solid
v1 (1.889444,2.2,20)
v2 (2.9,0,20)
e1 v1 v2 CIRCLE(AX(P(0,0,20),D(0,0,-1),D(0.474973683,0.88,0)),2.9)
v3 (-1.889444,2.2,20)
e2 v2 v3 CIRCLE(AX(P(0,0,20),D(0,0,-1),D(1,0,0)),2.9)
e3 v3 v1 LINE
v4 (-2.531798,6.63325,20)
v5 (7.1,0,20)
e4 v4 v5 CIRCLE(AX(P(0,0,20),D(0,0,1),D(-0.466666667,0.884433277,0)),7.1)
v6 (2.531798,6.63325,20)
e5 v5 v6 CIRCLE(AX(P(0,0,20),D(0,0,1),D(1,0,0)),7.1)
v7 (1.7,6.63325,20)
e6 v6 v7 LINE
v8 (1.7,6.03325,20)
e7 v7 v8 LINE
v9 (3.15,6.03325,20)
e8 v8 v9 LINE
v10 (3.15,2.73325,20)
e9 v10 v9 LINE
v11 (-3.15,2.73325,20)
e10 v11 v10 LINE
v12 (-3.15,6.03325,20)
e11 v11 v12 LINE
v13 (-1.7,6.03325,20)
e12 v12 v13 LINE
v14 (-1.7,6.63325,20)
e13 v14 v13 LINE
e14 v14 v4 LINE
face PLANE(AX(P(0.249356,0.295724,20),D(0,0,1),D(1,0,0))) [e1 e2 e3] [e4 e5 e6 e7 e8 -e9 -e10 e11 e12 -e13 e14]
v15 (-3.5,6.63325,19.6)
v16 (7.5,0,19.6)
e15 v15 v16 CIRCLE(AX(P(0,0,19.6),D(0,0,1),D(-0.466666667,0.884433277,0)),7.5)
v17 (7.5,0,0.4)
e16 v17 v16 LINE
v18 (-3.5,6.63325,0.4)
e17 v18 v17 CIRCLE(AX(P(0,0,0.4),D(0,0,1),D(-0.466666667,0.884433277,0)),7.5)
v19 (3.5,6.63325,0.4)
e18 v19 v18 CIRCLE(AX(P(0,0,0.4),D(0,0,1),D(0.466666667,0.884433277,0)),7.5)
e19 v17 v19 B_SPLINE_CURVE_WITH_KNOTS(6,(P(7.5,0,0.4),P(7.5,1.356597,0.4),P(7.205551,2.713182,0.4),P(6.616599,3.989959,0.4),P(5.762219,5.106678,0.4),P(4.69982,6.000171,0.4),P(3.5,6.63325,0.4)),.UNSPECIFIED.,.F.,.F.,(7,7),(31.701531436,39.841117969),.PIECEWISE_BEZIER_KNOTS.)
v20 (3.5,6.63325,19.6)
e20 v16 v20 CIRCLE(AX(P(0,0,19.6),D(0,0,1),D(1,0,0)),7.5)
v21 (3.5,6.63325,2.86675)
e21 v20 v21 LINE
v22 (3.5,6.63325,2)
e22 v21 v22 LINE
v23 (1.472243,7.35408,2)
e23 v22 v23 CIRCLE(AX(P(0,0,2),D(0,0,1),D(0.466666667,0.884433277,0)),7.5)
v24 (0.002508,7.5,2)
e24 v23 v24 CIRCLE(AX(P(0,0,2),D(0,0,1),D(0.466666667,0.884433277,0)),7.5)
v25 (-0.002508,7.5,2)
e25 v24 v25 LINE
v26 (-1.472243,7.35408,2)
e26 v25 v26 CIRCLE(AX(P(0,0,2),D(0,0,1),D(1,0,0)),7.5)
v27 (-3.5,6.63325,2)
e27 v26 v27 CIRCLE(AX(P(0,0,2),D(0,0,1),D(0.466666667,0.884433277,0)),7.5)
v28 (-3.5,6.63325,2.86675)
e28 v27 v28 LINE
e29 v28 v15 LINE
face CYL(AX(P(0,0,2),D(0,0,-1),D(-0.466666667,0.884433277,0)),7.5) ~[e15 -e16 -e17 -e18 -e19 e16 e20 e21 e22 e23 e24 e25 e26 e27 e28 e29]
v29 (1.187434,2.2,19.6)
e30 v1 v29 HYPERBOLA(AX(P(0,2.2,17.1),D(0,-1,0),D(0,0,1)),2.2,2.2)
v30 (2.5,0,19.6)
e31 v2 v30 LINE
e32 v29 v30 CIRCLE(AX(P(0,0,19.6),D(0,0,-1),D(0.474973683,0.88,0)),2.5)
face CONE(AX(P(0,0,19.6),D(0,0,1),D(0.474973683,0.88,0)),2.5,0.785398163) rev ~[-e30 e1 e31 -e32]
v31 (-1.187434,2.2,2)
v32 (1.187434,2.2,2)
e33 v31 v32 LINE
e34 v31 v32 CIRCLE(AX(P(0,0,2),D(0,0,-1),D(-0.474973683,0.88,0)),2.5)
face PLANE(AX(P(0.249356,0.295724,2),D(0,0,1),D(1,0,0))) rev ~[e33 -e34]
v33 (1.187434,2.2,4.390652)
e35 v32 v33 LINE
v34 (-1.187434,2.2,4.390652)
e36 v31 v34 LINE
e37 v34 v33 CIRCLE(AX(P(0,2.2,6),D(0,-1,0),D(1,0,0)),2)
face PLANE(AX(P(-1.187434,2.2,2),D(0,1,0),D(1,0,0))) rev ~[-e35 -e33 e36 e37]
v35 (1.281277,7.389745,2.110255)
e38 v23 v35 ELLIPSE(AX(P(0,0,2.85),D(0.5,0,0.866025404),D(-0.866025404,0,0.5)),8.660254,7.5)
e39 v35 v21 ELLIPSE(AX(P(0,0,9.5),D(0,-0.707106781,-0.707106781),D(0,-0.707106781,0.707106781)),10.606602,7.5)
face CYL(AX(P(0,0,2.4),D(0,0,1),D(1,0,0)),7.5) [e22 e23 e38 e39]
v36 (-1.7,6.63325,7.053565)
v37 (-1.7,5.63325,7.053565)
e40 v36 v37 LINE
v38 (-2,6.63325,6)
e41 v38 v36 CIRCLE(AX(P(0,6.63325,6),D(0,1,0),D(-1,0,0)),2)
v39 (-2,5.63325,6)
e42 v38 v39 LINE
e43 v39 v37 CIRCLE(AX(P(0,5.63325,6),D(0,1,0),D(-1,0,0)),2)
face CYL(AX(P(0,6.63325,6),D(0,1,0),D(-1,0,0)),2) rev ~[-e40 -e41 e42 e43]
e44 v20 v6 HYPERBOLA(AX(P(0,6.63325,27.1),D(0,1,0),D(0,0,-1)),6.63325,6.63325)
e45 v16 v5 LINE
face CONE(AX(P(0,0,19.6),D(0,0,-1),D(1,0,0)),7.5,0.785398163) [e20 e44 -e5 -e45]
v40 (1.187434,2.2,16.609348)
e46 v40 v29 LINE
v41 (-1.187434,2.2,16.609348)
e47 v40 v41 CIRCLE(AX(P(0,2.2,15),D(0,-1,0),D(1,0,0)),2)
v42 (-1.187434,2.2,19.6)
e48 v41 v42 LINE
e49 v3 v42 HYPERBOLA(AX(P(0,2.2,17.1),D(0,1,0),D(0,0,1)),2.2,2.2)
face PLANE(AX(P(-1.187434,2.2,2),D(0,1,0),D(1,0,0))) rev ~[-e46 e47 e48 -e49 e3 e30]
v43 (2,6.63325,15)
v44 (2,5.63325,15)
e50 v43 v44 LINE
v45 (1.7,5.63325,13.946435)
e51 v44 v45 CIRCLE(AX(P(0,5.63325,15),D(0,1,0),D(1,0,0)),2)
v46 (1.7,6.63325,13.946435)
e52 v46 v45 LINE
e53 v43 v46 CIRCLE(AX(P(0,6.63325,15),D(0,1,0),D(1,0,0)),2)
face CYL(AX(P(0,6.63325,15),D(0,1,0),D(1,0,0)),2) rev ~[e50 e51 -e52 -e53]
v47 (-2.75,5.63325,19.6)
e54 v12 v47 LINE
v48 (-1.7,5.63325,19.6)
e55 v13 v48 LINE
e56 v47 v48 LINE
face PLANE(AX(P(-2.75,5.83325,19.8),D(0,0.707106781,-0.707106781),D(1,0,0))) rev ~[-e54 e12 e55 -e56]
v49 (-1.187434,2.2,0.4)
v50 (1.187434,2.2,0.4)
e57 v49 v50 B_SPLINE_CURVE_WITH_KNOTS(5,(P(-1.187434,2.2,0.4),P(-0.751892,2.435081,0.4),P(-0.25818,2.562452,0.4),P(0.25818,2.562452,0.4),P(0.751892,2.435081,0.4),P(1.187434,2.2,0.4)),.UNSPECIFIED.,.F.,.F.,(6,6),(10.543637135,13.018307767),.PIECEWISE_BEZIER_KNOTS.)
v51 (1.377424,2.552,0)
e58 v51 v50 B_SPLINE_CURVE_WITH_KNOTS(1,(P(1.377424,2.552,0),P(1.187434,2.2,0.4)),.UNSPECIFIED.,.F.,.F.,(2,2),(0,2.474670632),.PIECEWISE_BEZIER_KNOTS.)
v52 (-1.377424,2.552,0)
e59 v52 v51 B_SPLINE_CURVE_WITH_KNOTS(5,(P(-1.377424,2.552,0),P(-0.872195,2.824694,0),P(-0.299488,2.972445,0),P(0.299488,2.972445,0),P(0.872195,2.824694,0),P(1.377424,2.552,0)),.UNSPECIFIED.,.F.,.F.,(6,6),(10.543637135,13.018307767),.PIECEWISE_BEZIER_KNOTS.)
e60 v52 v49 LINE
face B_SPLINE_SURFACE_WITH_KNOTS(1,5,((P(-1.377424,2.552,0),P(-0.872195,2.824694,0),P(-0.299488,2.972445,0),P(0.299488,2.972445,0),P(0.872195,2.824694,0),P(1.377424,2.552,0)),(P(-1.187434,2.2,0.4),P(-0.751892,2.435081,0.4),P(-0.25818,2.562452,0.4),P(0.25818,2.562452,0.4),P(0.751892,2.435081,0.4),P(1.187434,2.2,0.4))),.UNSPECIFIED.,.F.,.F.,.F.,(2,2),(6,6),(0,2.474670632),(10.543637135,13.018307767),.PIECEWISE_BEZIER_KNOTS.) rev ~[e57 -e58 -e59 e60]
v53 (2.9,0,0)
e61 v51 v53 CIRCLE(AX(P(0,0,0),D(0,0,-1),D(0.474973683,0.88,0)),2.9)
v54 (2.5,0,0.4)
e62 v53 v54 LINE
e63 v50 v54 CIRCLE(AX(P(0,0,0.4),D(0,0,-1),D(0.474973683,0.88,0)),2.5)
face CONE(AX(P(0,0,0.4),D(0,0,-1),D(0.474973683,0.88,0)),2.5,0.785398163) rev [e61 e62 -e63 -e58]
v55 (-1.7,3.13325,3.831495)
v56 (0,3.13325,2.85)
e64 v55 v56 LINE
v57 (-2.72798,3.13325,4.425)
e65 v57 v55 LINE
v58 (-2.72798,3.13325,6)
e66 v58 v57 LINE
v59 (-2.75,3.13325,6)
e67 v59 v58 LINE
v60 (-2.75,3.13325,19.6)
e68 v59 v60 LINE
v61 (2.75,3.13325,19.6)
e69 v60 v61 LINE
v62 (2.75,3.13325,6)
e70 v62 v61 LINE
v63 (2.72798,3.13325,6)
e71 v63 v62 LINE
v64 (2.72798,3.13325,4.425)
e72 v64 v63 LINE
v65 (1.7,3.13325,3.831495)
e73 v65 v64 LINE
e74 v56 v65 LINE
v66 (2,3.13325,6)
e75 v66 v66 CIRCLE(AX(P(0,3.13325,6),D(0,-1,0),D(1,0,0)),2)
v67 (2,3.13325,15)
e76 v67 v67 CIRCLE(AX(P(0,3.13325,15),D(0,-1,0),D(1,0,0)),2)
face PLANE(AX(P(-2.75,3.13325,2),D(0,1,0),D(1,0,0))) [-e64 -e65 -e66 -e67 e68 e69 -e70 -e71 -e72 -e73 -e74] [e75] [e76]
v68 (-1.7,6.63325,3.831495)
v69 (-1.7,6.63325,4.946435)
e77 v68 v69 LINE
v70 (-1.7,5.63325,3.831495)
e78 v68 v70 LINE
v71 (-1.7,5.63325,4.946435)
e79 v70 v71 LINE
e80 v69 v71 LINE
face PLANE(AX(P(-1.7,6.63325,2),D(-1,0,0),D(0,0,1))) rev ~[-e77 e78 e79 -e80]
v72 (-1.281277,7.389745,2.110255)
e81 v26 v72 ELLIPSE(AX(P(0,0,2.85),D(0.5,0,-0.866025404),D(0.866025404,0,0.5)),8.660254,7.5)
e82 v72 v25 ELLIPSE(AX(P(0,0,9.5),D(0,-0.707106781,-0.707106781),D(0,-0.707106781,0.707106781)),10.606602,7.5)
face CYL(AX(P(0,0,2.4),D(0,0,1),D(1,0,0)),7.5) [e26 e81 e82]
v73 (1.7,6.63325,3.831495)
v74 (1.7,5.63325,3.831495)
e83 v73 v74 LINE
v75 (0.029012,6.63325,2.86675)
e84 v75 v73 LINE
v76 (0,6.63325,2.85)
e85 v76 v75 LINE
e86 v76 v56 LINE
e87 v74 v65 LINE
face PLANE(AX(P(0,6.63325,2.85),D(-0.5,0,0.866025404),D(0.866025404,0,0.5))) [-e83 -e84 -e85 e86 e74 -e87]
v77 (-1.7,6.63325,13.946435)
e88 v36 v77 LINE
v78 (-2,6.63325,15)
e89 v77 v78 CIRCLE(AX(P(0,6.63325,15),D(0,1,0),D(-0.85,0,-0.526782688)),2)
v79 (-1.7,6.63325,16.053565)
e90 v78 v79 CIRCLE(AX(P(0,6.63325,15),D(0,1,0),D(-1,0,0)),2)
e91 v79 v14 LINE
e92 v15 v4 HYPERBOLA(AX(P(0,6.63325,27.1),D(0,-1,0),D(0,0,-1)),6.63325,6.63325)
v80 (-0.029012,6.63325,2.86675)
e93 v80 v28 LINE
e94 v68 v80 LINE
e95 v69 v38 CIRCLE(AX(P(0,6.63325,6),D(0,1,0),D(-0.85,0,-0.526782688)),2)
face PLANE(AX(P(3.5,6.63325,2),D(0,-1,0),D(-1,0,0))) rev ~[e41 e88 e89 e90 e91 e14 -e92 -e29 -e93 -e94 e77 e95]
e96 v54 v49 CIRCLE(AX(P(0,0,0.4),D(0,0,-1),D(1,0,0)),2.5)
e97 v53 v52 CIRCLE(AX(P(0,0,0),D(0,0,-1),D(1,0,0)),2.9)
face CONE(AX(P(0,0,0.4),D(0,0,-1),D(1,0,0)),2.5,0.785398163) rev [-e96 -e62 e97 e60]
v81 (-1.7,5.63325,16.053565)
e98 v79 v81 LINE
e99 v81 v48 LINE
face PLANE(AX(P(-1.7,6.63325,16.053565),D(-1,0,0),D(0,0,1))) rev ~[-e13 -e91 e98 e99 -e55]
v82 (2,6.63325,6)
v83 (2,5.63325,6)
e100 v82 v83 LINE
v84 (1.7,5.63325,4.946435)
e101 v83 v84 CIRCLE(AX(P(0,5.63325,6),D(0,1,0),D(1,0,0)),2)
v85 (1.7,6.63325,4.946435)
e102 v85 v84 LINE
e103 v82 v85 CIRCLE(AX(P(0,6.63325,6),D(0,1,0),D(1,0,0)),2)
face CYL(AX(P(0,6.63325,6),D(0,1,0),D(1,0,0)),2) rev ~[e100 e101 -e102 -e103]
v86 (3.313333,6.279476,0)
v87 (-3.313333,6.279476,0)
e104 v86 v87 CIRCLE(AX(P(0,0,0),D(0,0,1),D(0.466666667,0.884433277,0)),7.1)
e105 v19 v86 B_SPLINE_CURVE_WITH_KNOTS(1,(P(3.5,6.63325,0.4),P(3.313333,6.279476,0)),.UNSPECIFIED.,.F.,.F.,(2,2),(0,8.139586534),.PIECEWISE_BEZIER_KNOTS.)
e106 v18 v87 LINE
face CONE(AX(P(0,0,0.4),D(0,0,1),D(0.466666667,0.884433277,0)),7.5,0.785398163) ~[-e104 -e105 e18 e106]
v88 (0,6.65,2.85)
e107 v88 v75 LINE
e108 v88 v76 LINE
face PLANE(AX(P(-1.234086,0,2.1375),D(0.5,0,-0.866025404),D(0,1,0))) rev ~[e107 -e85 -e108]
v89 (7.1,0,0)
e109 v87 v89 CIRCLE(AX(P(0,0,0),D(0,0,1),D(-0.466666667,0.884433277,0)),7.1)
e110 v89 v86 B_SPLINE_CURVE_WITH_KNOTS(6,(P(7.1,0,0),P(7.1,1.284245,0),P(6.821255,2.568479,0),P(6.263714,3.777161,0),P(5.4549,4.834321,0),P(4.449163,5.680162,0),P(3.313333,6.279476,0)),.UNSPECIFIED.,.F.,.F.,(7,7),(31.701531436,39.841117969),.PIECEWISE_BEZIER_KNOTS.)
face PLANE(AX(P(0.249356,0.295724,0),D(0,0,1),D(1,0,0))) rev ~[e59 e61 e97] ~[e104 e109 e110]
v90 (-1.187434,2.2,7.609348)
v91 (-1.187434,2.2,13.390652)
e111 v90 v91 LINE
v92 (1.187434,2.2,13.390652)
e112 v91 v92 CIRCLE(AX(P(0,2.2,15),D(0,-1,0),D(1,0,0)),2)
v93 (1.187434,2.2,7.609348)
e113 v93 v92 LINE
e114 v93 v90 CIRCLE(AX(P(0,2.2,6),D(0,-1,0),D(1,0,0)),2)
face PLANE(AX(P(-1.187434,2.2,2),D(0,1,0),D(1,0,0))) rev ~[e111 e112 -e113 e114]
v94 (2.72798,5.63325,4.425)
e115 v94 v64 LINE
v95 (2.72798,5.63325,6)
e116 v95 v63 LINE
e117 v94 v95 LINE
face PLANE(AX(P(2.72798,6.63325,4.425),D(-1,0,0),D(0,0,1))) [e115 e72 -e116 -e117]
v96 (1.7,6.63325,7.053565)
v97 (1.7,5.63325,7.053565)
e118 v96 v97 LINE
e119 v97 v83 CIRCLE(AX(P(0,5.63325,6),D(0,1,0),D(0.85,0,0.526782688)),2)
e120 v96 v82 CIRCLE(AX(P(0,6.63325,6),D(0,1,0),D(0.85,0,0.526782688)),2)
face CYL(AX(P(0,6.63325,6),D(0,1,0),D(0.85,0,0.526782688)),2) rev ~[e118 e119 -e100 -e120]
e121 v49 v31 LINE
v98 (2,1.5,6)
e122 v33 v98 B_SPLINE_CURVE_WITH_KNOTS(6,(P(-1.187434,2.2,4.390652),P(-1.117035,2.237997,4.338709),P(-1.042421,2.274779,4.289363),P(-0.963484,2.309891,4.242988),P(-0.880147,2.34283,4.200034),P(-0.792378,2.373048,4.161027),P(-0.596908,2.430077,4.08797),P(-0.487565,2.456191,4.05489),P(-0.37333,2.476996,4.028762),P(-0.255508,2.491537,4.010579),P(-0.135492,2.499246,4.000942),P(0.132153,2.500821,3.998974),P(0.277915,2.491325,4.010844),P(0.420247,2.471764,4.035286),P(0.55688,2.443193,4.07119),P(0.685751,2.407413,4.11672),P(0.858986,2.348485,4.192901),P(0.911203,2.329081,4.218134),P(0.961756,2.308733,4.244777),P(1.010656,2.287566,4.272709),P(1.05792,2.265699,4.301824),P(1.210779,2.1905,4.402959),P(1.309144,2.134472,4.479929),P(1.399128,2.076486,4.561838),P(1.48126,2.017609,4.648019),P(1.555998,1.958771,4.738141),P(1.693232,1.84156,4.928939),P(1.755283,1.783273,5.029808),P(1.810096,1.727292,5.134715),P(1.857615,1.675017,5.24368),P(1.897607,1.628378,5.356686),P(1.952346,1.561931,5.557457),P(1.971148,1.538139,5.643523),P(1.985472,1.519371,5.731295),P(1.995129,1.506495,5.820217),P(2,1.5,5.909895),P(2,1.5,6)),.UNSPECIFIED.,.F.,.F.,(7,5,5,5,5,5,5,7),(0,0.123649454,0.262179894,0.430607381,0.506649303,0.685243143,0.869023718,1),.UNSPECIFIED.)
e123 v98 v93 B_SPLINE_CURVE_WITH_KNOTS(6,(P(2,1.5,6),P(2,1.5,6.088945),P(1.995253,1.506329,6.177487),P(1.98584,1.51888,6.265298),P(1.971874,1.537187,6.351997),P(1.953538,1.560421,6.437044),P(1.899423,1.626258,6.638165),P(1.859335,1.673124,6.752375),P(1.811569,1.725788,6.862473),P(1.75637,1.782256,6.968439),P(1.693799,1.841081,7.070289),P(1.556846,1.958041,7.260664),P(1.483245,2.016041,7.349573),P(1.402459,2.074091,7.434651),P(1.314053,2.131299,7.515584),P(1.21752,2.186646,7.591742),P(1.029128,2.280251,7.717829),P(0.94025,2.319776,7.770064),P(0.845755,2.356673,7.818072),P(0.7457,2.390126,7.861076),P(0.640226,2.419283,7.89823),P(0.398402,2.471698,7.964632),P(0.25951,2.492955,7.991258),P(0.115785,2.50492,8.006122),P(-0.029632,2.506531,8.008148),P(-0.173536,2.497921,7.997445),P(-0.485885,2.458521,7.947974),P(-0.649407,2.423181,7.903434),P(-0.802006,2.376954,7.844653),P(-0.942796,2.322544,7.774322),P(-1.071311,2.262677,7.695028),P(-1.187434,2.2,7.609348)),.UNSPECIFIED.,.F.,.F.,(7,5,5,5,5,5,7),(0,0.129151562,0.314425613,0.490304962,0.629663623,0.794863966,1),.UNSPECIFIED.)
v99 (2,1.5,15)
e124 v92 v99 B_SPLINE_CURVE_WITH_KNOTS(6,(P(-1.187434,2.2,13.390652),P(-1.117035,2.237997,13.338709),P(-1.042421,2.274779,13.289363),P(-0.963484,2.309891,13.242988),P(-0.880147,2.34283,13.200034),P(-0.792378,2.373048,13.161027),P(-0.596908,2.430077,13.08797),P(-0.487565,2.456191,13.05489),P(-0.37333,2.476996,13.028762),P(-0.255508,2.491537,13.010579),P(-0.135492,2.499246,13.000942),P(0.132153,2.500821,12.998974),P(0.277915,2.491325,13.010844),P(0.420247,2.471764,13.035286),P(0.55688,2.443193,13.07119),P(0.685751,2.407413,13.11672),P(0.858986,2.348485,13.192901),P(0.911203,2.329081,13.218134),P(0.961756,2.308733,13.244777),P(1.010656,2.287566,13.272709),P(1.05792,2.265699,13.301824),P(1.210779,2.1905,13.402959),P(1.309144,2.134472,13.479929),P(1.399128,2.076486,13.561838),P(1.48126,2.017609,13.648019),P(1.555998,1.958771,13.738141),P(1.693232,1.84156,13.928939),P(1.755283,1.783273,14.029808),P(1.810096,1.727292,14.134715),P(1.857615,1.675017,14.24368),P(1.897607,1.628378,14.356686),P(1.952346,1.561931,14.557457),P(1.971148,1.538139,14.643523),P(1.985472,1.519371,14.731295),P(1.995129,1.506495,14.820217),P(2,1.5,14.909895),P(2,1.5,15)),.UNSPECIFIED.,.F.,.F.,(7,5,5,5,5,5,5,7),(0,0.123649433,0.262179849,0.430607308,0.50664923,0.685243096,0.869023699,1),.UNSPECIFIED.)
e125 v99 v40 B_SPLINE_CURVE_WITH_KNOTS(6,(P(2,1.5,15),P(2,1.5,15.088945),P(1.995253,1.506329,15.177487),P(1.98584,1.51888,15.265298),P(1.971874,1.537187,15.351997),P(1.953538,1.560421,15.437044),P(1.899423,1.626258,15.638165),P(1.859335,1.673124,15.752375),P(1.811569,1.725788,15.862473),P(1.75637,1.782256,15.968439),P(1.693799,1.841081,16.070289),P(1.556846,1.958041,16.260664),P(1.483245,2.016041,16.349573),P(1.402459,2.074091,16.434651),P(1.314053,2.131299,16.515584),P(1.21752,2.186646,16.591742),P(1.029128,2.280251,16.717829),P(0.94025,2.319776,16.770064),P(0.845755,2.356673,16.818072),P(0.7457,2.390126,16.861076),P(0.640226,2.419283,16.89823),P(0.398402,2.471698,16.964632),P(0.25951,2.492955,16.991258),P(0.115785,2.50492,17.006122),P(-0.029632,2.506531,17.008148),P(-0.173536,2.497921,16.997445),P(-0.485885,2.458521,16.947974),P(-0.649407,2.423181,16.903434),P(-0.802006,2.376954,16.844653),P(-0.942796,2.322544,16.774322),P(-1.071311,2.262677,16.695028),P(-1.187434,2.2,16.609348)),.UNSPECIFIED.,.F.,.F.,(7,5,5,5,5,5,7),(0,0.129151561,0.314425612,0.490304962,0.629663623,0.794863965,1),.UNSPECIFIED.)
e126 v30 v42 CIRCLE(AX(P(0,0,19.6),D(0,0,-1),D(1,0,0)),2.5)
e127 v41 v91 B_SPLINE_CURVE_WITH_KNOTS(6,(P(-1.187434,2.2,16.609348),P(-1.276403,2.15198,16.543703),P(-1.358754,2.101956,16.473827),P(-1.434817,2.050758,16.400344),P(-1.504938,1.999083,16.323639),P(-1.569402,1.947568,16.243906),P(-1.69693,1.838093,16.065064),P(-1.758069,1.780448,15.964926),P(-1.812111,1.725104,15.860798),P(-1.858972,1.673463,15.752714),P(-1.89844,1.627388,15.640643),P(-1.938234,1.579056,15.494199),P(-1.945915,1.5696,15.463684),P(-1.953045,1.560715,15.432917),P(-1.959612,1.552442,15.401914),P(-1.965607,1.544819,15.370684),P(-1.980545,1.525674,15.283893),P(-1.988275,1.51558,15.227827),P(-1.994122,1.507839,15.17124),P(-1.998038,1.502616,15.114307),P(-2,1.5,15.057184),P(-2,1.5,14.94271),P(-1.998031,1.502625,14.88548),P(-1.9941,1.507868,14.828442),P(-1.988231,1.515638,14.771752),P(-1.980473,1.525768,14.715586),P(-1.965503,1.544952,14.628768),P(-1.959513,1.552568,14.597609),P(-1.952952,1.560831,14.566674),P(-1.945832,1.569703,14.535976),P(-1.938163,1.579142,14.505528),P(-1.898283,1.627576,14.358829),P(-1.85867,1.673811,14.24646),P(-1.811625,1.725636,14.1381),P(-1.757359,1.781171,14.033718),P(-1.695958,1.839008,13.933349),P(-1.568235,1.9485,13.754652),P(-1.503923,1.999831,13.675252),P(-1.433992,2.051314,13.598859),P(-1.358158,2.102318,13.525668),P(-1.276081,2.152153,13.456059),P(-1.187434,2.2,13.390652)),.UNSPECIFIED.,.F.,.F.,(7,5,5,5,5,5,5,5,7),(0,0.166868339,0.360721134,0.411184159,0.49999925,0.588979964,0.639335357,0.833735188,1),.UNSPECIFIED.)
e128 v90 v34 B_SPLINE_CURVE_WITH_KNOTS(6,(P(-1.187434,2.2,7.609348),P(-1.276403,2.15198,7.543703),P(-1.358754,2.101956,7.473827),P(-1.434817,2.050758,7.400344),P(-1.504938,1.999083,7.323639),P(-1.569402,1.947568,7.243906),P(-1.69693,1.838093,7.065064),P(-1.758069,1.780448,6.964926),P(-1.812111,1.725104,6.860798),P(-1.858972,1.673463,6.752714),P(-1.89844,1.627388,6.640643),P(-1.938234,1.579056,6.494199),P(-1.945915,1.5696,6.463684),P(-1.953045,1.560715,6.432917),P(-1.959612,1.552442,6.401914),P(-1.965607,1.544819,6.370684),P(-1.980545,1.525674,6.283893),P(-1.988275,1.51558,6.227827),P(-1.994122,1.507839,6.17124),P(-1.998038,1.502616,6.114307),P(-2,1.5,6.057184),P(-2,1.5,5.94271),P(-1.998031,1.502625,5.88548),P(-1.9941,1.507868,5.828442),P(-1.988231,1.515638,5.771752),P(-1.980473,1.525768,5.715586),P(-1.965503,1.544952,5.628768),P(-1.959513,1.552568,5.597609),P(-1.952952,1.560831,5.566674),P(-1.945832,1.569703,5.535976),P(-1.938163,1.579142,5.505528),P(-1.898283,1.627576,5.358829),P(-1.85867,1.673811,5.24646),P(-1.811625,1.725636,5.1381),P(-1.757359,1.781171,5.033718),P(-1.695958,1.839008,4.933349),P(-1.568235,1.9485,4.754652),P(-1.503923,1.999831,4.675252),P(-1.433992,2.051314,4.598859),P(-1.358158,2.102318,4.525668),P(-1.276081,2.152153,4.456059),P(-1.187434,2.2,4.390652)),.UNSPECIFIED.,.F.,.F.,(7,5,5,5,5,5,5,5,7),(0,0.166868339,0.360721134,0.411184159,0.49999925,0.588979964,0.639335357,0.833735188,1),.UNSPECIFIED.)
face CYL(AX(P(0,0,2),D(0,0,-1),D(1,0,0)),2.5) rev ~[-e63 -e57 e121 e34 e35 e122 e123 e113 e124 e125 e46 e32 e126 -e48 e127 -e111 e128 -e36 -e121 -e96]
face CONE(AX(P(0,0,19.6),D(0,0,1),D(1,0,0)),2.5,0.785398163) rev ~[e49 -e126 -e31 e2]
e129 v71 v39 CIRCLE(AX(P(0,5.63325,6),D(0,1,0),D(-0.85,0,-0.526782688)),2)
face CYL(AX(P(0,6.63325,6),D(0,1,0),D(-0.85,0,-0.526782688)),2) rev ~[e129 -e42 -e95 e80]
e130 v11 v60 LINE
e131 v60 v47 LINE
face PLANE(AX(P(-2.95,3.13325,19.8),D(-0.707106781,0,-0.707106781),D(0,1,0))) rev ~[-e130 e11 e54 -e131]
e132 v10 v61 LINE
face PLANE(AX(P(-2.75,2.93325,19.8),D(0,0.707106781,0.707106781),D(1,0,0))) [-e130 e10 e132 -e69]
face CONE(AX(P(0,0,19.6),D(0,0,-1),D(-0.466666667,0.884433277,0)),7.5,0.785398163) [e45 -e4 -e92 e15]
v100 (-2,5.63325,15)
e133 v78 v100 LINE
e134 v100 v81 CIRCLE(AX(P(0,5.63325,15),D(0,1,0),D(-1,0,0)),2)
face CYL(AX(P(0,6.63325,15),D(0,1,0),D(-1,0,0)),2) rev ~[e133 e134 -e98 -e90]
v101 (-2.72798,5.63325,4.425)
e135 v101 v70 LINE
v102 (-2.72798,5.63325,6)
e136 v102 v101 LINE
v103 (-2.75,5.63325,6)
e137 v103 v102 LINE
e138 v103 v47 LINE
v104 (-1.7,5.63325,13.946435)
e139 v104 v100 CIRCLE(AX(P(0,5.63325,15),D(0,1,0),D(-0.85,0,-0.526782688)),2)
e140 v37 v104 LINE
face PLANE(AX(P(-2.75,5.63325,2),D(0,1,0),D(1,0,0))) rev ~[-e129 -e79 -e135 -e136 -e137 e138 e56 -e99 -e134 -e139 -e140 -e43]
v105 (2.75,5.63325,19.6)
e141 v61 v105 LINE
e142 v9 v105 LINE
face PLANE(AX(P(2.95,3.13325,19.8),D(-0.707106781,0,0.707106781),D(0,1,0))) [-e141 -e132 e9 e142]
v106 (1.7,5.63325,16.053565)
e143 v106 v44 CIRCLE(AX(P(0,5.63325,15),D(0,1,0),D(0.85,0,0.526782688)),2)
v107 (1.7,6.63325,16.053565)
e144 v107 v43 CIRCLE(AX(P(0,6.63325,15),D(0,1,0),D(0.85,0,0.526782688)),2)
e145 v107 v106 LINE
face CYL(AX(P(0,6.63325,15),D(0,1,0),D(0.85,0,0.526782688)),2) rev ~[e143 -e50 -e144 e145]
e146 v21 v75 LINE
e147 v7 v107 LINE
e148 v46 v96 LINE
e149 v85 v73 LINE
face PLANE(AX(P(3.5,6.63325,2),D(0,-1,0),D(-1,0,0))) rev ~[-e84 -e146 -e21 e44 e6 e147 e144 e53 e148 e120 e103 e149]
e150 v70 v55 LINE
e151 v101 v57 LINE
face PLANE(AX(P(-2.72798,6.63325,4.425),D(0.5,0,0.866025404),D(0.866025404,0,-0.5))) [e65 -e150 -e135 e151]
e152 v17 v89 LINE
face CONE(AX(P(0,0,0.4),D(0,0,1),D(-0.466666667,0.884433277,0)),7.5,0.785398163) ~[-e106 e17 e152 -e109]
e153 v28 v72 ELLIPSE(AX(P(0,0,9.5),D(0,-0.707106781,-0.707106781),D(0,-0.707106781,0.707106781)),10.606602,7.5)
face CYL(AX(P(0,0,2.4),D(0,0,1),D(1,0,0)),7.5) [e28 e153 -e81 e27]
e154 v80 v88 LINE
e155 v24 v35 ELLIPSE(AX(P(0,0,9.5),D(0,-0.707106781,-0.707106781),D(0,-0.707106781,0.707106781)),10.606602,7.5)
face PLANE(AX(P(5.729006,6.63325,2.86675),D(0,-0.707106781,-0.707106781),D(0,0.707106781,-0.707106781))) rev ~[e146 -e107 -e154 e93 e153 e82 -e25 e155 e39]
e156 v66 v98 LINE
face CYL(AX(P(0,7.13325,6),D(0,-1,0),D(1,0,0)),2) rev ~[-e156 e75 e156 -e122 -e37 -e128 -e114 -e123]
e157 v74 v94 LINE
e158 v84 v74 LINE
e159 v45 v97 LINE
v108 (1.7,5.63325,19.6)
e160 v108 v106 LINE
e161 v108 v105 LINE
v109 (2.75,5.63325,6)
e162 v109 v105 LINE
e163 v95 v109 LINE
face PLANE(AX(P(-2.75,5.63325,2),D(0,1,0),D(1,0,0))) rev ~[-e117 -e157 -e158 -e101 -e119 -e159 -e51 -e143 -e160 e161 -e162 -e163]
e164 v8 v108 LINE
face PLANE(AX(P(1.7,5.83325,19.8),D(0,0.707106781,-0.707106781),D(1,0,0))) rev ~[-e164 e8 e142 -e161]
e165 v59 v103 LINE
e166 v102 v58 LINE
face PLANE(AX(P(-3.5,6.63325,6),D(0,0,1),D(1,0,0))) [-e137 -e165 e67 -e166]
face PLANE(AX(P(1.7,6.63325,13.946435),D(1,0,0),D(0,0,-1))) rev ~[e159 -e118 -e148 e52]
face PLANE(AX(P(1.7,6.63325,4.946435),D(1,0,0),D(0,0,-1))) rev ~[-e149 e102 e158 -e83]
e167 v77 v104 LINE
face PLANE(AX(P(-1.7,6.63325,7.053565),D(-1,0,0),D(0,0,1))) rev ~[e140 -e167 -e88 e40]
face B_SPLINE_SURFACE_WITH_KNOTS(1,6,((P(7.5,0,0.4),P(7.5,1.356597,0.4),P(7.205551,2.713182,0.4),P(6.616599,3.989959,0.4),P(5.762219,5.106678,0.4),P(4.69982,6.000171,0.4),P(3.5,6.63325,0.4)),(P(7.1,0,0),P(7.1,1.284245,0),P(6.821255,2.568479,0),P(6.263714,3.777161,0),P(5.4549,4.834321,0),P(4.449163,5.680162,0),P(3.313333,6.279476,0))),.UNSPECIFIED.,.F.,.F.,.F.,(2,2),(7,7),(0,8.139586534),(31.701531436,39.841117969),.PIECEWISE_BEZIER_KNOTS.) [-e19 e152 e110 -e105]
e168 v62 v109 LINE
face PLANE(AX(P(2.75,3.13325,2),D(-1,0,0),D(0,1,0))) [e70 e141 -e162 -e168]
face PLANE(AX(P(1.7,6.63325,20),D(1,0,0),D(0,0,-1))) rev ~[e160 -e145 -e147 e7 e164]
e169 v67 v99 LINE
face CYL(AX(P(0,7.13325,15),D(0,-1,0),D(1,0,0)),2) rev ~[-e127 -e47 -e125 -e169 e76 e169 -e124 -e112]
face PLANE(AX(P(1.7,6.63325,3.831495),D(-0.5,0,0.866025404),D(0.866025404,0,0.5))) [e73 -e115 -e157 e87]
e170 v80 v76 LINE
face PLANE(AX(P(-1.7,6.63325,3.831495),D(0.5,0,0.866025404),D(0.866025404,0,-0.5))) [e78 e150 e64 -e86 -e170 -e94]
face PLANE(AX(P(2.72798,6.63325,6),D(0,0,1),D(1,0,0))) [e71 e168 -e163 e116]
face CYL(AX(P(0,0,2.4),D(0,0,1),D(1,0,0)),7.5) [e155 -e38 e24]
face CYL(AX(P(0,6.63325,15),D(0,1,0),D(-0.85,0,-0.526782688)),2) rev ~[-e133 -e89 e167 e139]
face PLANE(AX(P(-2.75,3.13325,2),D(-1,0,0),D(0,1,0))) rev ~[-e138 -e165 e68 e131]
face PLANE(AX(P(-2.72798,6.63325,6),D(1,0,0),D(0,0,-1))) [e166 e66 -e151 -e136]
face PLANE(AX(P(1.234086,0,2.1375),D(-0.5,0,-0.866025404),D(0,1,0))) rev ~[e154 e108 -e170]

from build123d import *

# Parameters (mm, degrees)
F1_DEPTH     = 2
F2_W         = 5.5
F2_H         = 2.5
F3_DEPTH     = 18
F6_DEPTH     = 1.34
F7_D         = 4
F7_DEPTH     = 4
F7_START     = 3.5
F7_TIP       = 1.2017212381
F8_DEPTH     = 3.5
F9_T4_DEPTH  = 11.4580124596
F9_S5_R      = 7.5
F9_T6_DEPTH  = 7
F9_T12_DEPTH = 11.4580124596
F9_S13_R     = 7.5
F9_T14_DEPTH = 7
F9_T20_DEPTH = 11.4580124596
F9_S21_R     = 7.5
F9_T22_DEPTH = 7
F10_SIZE     = 0.4


# Not quite as in the source:
# - a fillet or chamfer that OpenCascade refuses, or shapes differently, is made with other operations: its cross-section is extruded or revolved along the edge and cut away or added


with BuildPart() as f1:
    # F0 (on Top) → F1 (new body)
    with BuildSketch(Plane.XY):
        with BuildLine():
            ThreePointArc((-3.5, 6.6332495807), (-3.8729833462, -6.4226162893), (7.5, 0))
            ThreePointArc((7.5, 0), (6.4226162893, 3.8729833462), (3.5, 6.6332495807))
            Line((3.5, 6.6332495807), (-3.5, 6.6332495807))
        make_face()
        with BuildLine():
            ThreePointArc((1.1874342087, 2.2), (2.146926352, 1.2809009482), (2.5, 0))
            ThreePointArc((2.5, 0), (-1.2809009482, -2.146926352), (-1.1874342087, 2.2))
            ThreePointArc((-1.1874342087, 2.2), (0, 2.5), (1.1874342087, 2.2))
        make_face(mode=Mode.SUBTRACT)
        with BuildLine():
            Line((-3.5, 6.6332495807), (3.5, 6.6332495807))
            ThreePointArc((3.5, 6.6332495807), (0, 7.5), (-3.5, 6.6332495807))
        make_face()
    extrude(amount=F1_DEPTH)

    # F2 (on face) → F3 (join)
    with BuildSketch(Plane.XY.offset(2)):
        with BuildLine():
            ThreePointArc((-3.5, 6.6332495807), (-3.8729833462, -6.4226162893), (7.5, 0))
            ThreePointArc((7.5, 0), (6.4226162893, 3.8729833462), (3.5, 6.6332495807))
            Line((3.5, 6.6332495807), (-3.5, 6.6332495807))
        make_face()
        with BuildLine():
            ThreePointArc((1.1874342087, 2.2), (2.146926352, 1.2809009482), (2.5, 0))
            ThreePointArc((2.5, 0), (-1.2809009482, -2.146926352), (-1.1874342087, 2.2))
            ThreePointArc((-1.1874342087, 2.2), (0, 2.5), (1.1874342087, 2.2))
        make_face(mode=Mode.SUBTRACT)
        with Locations((0, 4.3832495807)):
            Rectangle(F2_W, F2_H, mode=Mode.SUBTRACT)
        with BuildLine():
            Line((-1.1874342087, 2.2), (1.1874342087, 2.2))
            ThreePointArc((1.1874342087, 2.2), (0, 2.5), (-1.1874342087, 2.2))
        make_face()
    extrude(amount=F3_DEPTH)

    # F5 (on face) → F6 (cut)
    with BuildSketch(Plane(origin=(0, 6.6332495807, 0), x_dir=(-1, 0, 0), z_dir=(0, 1, 0))):
        with BuildLine():
            Line((1.7, 20), (-1.7, 20))
            Line((-1.7, 20), (-1.7, 16.0535653753))
            ThreePointArc((-1.7, 16.0535653753), (0, 17), (1.7, 16.0535653753))
            Line((1.7, 16.0535653753), (1.7, 20))
        make_face()
        Polygon((-1.7, 3.8314954576), (-1.7, 2), (1.7, 2), (1.7, 3.8314954576), (0, 2.85), align=None)
        with BuildLine():
            Line((1.7, 15), (-1.7, 15))
            Line((-1.7, 15), (-1.7, 13.9464346247))
            ThreePointArc((-1.7, 13.9464346247), (0, 13), (1.7, 13.9464346247))
            Line((1.7, 13.9464346247), (1.7, 15))
        make_face()
        with BuildLine():
            Line((-1.7, 15), (-2, 15))
            ThreePointArc((-2, 15), (-1.9235384062, 14.4522774425), (-1.7, 13.9464346247))
            Line((-1.7, 13.9464346247), (-1.7, 15))
        make_face()
        with BuildLine():
            ThreePointArc((-1.7, 16.0535653753), (-1.9235384062, 15.5477225575), (-2, 15))
            Line((-2, 15), (-1.7, 15))
            Line((-1.7, 15), (-1.7, 16.0535653753))
        make_face()
        with BuildLine():
            Line((1.7, 16.0535653753), (1.7, 15))
            Line((1.7, 15), (2, 15))
            ThreePointArc((2, 15), (1.9235384062, 15.5477225575), (1.7, 16.0535653753))
        make_face()
        with BuildLine():
            Line((2, 15), (1.7, 15))
            Line((1.7, 15), (1.7, 13.9464346247))
            ThreePointArc((1.7, 13.9464346247), (1.9235384062, 14.4522774425), (2, 15))
        make_face()
        with BuildLine():
            Line((-1.7, 16.0535653753), (-1.7, 15))
            Line((-1.7, 15), (1.7, 15))
            Line((1.7, 15), (1.7, 16.0535653753))
            ThreePointArc((1.7, 16.0535653753), (0, 17), (-1.7, 16.0535653753))
        make_face()
        with BuildLine():
            Line((-1.7, 6), (-1.7, 4.9464346247))
            ThreePointArc((-1.7, 4.9464346247), (0, 4), (1.7, 4.9464346247))
            Line((1.7, 4.9464346247), (1.7, 6))
            Line((1.7, 6), (-1.7, 6))
        make_face()
        with BuildLine():
            ThreePointArc((-2, 6), (-1.9235384062, 5.4522774425), (-1.7, 4.9464346247))
            Line((-1.7, 4.9464346247), (-1.7, 6))
            Line((-1.7, 6), (-2, 6))
        make_face()
        with BuildLine():
            Line((-1.7, 7.0535653753), (-1.7, 6))
            Line((-1.7, 6), (1.7, 6))
            Line((1.7, 6), (1.7, 7.0535653753))
            ThreePointArc((1.7, 7.0535653753), (0, 8), (-1.7, 7.0535653753))
        make_face()
        with BuildLine():
            Line((1.7, 7.0535653753), (1.7, 6))
            Line((1.7, 6), (2, 6))
            ThreePointArc((2, 6), (1.9235384062, 6.5477225575), (1.7, 7.0535653753))
        make_face()
        with BuildLine():
            Line((1.7, 6), (1.7, 4.9464346247))
            ThreePointArc((1.7, 4.9464346247), (1.9235384062, 5.4522774425), (2, 6))
            Line((2, 6), (1.7, 6))
        make_face()
        with BuildLine():
            ThreePointArc((-1.7, 7.0535653753), (-1.9235384062, 6.5477225575), (-2, 6))
            Line((-2, 6), (-1.7, 6))
            Line((-1.7, 6), (-1.7, 7.0535653753))
        make_face()
        with BuildLine():
            Line((-1.7, 4.9464346247), (-1.7, 3.8314954576))
            Line((-1.7, 3.8314954576), (0, 2.85))
            Line((0, 2.85), (1.7, 3.8314954576))
            Line((1.7, 3.8314954576), (1.7, 4.9464346247))
            ThreePointArc((1.7, 4.9464346247), (0, 4), (-1.7, 4.9464346247))
        make_face()
        with BuildLine():
            ThreePointArc((1.7, 13.9464346247), (0, 13), (-1.7, 13.9464346247))
            Line((-1.7, 13.9464346247), (-1.7, 8.1685045424))
            Line((-1.7, 8.1685045424), (0, 9.15))
            Line((0, 9.15), (1.7, 8.1685045424))
            Line((1.7, 8.1685045424), (1.7, 13.9464346247))
        make_face()
        with BuildLine():
            Line((-1.7, 8.1685045424), (-1.7, 7.0535653753))
            ThreePointArc((-1.7, 7.0535653753), (0, 8), (1.7, 7.0535653753))
            Line((1.7, 7.0535653753), (1.7, 8.1685045424))
            Line((1.7, 8.1685045424), (0, 9.15))
            Line((0, 9.15), (-1.7, 8.1685045424))
        make_face()
    extrude(amount=-F6_DEPTH, mode=Mode.SUBTRACT)

    # F7
    # its depths count from where the whole tool has entered the part; down to there all is cleared
    with Locations(Plane(origin=(0, 6.6332495807, 0), x_dir=(-1, 0, 0), z_dir=(0, 1, 0)).offset(-F7_START)):
        with Locations((0, 6), (0, 15)):
            Hole(F7_D / 2, depth=F7_DEPTH)
            with Locations((0, 0, -(F7_DEPTH + F7_TIP / 2))):  # 118° drill point
                Cone(0, F7_D / 2, F7_TIP, mode=Mode.SUBTRACT)

    # F5 (on face) → F8 (join)
    with BuildSketch(Plane(origin=(0, 6.6332495807, 0), x_dir=(-1, 0, 0), z_dir=(0, 1, 0))):
        Polygon((-3.5, 6), (-3.5, 2), (-1.7, 2), (-1.7, 3.8314954576), (-2.7279800219, 4.425), (-2.7279800219, 6), align=None)
        Polygon((-1.7, 3.8314954576), (-1.7, 2), (1.7, 2), (1.7, 3.8314954576), (0, 2.85), align=None)
        Polygon((1.7, 3.8314954576), (1.7, 2), (3.5, 2), (3.5, 6), (2.7279800219, 6), (2.7279800219, 4.425), align=None)
    extrude(amount=-F8_DEPTH)

    # F9: chamfer of 0.86675 on 1 edges, made by hand


with BuildPart() as f9_tool2:
    # F9_s3 → F9_t4 (new body)
    with BuildSketch(Plane.YZ.offset(5.7290062298)):
        Polygon((6.6332495807, 2.86675), (7.4999995807, 2), (6.6332495807, 2), align=None)
    extrude(amount=-F9_T4_DEPTH)

    # F9_s5 → F9_t6 (intersect, symmetric)
    with BuildSketch(Plane.XY.offset(2.4)):
        Circle(F9_S5_R)
    extrude(amount=F9_T6_DEPTH, both=True, mode=Mode.INTERSECT)

    split(bisect_by=Plane(origin=(-1.2340862004, 0, 2.1375), x_dir=(0, 1, 0), z_dir=(0.5, 0, -0.8660254038)), keep=Keep.TOP)

    split(bisect_by=Plane(origin=(1.2340862004, 0, 2.1375), x_dir=(0, 1, 0), z_dir=(0.5, 0, 0.8660254038)), keep=Keep.TOP)


with BuildPart() as f1_1:
    add(f1.part)

    # F9_t1: union F9_tool2
    add(f9_tool2.part)


with BuildPart() as f9_tool10:
    # F9_s11 → F9_t12 (new body)
    with BuildSketch(Plane.YZ.offset(5.7290062298)):
        Polygon((6.6332495807, 2.86675), (7.4999995807, 2), (6.6332495807, 2), align=None)
    extrude(amount=-F9_T12_DEPTH)

    # F9_s13 → F9_t14 (intersect, symmetric)
    with BuildSketch(Plane.XY.offset(2.4)):
        Circle(F9_S13_R)
    extrude(amount=F9_T14_DEPTH, both=True, mode=Mode.INTERSECT)

    split(bisect_by=Plane(origin=(-1.2340862004, 0, 2.1375), x_dir=(0, 1, 0), z_dir=(0.5, 0, -0.8660254038)), keep=Keep.TOP)

    split(bisect_by=Plane(origin=(1.2340862004, 0, 2.1375), x_dir=(0, 1, 0), z_dir=(-0.5, 0, -0.8660254038)), keep=Keep.TOP)


with BuildPart() as f1_2:
    add(f1_1.part)

    # F9_t9: union F9_tool10
    add(f9_tool10.part)


with BuildPart() as f9_tool18:
    # F9_s19 → F9_t20 (new body)
    with BuildSketch(Plane.YZ.offset(5.7290062298)):
        Polygon((6.6332495807, 2.86675), (7.4999995807, 2), (6.6332495807, 2), align=None)
    extrude(amount=-F9_T20_DEPTH)

    # F9_s21 → F9_t22 (intersect, symmetric)
    with BuildSketch(Plane.XY.offset(2.4)):
        Circle(F9_S21_R)
    extrude(amount=F9_T22_DEPTH, both=True, mode=Mode.INTERSECT)

    split(bisect_by=Plane(origin=(-1.2340862004, 0, 2.1375), x_dir=(0, 1, 0), z_dir=(-0.5, 0, 0.8660254038)), keep=Keep.TOP)

    split(bisect_by=Plane(origin=(1.2340862004, 0, 2.1375), x_dir=(0, 1, 0), z_dir=(-0.5, 0, -0.8660254038)), keep=Keep.TOP)


with BuildPart() as f1_3:
    add(f1_2.part)

    # F9_t17: union F9_tool18
    add(f9_tool18.part)

    # F10
    f10_edges = [f1_3.edges().sort_by_distance(p)[0] for p in [
        (-7.5, 0, 0),
        (-1.187434, -2.2, 0),
        (0, -2.5, 20),
        (0, -7.5, 20),
        (0, 3.13325, 20),
        (2.75, 4.38325, 20),
        (2.225, 5.63325, 20),
        (-2.225, 5.63325, 20),
        (-2.75, 4.38325, 20),
    ]]
    chamfer(f10_edges, length=F10_SIZE)


solid = f1_3.part
